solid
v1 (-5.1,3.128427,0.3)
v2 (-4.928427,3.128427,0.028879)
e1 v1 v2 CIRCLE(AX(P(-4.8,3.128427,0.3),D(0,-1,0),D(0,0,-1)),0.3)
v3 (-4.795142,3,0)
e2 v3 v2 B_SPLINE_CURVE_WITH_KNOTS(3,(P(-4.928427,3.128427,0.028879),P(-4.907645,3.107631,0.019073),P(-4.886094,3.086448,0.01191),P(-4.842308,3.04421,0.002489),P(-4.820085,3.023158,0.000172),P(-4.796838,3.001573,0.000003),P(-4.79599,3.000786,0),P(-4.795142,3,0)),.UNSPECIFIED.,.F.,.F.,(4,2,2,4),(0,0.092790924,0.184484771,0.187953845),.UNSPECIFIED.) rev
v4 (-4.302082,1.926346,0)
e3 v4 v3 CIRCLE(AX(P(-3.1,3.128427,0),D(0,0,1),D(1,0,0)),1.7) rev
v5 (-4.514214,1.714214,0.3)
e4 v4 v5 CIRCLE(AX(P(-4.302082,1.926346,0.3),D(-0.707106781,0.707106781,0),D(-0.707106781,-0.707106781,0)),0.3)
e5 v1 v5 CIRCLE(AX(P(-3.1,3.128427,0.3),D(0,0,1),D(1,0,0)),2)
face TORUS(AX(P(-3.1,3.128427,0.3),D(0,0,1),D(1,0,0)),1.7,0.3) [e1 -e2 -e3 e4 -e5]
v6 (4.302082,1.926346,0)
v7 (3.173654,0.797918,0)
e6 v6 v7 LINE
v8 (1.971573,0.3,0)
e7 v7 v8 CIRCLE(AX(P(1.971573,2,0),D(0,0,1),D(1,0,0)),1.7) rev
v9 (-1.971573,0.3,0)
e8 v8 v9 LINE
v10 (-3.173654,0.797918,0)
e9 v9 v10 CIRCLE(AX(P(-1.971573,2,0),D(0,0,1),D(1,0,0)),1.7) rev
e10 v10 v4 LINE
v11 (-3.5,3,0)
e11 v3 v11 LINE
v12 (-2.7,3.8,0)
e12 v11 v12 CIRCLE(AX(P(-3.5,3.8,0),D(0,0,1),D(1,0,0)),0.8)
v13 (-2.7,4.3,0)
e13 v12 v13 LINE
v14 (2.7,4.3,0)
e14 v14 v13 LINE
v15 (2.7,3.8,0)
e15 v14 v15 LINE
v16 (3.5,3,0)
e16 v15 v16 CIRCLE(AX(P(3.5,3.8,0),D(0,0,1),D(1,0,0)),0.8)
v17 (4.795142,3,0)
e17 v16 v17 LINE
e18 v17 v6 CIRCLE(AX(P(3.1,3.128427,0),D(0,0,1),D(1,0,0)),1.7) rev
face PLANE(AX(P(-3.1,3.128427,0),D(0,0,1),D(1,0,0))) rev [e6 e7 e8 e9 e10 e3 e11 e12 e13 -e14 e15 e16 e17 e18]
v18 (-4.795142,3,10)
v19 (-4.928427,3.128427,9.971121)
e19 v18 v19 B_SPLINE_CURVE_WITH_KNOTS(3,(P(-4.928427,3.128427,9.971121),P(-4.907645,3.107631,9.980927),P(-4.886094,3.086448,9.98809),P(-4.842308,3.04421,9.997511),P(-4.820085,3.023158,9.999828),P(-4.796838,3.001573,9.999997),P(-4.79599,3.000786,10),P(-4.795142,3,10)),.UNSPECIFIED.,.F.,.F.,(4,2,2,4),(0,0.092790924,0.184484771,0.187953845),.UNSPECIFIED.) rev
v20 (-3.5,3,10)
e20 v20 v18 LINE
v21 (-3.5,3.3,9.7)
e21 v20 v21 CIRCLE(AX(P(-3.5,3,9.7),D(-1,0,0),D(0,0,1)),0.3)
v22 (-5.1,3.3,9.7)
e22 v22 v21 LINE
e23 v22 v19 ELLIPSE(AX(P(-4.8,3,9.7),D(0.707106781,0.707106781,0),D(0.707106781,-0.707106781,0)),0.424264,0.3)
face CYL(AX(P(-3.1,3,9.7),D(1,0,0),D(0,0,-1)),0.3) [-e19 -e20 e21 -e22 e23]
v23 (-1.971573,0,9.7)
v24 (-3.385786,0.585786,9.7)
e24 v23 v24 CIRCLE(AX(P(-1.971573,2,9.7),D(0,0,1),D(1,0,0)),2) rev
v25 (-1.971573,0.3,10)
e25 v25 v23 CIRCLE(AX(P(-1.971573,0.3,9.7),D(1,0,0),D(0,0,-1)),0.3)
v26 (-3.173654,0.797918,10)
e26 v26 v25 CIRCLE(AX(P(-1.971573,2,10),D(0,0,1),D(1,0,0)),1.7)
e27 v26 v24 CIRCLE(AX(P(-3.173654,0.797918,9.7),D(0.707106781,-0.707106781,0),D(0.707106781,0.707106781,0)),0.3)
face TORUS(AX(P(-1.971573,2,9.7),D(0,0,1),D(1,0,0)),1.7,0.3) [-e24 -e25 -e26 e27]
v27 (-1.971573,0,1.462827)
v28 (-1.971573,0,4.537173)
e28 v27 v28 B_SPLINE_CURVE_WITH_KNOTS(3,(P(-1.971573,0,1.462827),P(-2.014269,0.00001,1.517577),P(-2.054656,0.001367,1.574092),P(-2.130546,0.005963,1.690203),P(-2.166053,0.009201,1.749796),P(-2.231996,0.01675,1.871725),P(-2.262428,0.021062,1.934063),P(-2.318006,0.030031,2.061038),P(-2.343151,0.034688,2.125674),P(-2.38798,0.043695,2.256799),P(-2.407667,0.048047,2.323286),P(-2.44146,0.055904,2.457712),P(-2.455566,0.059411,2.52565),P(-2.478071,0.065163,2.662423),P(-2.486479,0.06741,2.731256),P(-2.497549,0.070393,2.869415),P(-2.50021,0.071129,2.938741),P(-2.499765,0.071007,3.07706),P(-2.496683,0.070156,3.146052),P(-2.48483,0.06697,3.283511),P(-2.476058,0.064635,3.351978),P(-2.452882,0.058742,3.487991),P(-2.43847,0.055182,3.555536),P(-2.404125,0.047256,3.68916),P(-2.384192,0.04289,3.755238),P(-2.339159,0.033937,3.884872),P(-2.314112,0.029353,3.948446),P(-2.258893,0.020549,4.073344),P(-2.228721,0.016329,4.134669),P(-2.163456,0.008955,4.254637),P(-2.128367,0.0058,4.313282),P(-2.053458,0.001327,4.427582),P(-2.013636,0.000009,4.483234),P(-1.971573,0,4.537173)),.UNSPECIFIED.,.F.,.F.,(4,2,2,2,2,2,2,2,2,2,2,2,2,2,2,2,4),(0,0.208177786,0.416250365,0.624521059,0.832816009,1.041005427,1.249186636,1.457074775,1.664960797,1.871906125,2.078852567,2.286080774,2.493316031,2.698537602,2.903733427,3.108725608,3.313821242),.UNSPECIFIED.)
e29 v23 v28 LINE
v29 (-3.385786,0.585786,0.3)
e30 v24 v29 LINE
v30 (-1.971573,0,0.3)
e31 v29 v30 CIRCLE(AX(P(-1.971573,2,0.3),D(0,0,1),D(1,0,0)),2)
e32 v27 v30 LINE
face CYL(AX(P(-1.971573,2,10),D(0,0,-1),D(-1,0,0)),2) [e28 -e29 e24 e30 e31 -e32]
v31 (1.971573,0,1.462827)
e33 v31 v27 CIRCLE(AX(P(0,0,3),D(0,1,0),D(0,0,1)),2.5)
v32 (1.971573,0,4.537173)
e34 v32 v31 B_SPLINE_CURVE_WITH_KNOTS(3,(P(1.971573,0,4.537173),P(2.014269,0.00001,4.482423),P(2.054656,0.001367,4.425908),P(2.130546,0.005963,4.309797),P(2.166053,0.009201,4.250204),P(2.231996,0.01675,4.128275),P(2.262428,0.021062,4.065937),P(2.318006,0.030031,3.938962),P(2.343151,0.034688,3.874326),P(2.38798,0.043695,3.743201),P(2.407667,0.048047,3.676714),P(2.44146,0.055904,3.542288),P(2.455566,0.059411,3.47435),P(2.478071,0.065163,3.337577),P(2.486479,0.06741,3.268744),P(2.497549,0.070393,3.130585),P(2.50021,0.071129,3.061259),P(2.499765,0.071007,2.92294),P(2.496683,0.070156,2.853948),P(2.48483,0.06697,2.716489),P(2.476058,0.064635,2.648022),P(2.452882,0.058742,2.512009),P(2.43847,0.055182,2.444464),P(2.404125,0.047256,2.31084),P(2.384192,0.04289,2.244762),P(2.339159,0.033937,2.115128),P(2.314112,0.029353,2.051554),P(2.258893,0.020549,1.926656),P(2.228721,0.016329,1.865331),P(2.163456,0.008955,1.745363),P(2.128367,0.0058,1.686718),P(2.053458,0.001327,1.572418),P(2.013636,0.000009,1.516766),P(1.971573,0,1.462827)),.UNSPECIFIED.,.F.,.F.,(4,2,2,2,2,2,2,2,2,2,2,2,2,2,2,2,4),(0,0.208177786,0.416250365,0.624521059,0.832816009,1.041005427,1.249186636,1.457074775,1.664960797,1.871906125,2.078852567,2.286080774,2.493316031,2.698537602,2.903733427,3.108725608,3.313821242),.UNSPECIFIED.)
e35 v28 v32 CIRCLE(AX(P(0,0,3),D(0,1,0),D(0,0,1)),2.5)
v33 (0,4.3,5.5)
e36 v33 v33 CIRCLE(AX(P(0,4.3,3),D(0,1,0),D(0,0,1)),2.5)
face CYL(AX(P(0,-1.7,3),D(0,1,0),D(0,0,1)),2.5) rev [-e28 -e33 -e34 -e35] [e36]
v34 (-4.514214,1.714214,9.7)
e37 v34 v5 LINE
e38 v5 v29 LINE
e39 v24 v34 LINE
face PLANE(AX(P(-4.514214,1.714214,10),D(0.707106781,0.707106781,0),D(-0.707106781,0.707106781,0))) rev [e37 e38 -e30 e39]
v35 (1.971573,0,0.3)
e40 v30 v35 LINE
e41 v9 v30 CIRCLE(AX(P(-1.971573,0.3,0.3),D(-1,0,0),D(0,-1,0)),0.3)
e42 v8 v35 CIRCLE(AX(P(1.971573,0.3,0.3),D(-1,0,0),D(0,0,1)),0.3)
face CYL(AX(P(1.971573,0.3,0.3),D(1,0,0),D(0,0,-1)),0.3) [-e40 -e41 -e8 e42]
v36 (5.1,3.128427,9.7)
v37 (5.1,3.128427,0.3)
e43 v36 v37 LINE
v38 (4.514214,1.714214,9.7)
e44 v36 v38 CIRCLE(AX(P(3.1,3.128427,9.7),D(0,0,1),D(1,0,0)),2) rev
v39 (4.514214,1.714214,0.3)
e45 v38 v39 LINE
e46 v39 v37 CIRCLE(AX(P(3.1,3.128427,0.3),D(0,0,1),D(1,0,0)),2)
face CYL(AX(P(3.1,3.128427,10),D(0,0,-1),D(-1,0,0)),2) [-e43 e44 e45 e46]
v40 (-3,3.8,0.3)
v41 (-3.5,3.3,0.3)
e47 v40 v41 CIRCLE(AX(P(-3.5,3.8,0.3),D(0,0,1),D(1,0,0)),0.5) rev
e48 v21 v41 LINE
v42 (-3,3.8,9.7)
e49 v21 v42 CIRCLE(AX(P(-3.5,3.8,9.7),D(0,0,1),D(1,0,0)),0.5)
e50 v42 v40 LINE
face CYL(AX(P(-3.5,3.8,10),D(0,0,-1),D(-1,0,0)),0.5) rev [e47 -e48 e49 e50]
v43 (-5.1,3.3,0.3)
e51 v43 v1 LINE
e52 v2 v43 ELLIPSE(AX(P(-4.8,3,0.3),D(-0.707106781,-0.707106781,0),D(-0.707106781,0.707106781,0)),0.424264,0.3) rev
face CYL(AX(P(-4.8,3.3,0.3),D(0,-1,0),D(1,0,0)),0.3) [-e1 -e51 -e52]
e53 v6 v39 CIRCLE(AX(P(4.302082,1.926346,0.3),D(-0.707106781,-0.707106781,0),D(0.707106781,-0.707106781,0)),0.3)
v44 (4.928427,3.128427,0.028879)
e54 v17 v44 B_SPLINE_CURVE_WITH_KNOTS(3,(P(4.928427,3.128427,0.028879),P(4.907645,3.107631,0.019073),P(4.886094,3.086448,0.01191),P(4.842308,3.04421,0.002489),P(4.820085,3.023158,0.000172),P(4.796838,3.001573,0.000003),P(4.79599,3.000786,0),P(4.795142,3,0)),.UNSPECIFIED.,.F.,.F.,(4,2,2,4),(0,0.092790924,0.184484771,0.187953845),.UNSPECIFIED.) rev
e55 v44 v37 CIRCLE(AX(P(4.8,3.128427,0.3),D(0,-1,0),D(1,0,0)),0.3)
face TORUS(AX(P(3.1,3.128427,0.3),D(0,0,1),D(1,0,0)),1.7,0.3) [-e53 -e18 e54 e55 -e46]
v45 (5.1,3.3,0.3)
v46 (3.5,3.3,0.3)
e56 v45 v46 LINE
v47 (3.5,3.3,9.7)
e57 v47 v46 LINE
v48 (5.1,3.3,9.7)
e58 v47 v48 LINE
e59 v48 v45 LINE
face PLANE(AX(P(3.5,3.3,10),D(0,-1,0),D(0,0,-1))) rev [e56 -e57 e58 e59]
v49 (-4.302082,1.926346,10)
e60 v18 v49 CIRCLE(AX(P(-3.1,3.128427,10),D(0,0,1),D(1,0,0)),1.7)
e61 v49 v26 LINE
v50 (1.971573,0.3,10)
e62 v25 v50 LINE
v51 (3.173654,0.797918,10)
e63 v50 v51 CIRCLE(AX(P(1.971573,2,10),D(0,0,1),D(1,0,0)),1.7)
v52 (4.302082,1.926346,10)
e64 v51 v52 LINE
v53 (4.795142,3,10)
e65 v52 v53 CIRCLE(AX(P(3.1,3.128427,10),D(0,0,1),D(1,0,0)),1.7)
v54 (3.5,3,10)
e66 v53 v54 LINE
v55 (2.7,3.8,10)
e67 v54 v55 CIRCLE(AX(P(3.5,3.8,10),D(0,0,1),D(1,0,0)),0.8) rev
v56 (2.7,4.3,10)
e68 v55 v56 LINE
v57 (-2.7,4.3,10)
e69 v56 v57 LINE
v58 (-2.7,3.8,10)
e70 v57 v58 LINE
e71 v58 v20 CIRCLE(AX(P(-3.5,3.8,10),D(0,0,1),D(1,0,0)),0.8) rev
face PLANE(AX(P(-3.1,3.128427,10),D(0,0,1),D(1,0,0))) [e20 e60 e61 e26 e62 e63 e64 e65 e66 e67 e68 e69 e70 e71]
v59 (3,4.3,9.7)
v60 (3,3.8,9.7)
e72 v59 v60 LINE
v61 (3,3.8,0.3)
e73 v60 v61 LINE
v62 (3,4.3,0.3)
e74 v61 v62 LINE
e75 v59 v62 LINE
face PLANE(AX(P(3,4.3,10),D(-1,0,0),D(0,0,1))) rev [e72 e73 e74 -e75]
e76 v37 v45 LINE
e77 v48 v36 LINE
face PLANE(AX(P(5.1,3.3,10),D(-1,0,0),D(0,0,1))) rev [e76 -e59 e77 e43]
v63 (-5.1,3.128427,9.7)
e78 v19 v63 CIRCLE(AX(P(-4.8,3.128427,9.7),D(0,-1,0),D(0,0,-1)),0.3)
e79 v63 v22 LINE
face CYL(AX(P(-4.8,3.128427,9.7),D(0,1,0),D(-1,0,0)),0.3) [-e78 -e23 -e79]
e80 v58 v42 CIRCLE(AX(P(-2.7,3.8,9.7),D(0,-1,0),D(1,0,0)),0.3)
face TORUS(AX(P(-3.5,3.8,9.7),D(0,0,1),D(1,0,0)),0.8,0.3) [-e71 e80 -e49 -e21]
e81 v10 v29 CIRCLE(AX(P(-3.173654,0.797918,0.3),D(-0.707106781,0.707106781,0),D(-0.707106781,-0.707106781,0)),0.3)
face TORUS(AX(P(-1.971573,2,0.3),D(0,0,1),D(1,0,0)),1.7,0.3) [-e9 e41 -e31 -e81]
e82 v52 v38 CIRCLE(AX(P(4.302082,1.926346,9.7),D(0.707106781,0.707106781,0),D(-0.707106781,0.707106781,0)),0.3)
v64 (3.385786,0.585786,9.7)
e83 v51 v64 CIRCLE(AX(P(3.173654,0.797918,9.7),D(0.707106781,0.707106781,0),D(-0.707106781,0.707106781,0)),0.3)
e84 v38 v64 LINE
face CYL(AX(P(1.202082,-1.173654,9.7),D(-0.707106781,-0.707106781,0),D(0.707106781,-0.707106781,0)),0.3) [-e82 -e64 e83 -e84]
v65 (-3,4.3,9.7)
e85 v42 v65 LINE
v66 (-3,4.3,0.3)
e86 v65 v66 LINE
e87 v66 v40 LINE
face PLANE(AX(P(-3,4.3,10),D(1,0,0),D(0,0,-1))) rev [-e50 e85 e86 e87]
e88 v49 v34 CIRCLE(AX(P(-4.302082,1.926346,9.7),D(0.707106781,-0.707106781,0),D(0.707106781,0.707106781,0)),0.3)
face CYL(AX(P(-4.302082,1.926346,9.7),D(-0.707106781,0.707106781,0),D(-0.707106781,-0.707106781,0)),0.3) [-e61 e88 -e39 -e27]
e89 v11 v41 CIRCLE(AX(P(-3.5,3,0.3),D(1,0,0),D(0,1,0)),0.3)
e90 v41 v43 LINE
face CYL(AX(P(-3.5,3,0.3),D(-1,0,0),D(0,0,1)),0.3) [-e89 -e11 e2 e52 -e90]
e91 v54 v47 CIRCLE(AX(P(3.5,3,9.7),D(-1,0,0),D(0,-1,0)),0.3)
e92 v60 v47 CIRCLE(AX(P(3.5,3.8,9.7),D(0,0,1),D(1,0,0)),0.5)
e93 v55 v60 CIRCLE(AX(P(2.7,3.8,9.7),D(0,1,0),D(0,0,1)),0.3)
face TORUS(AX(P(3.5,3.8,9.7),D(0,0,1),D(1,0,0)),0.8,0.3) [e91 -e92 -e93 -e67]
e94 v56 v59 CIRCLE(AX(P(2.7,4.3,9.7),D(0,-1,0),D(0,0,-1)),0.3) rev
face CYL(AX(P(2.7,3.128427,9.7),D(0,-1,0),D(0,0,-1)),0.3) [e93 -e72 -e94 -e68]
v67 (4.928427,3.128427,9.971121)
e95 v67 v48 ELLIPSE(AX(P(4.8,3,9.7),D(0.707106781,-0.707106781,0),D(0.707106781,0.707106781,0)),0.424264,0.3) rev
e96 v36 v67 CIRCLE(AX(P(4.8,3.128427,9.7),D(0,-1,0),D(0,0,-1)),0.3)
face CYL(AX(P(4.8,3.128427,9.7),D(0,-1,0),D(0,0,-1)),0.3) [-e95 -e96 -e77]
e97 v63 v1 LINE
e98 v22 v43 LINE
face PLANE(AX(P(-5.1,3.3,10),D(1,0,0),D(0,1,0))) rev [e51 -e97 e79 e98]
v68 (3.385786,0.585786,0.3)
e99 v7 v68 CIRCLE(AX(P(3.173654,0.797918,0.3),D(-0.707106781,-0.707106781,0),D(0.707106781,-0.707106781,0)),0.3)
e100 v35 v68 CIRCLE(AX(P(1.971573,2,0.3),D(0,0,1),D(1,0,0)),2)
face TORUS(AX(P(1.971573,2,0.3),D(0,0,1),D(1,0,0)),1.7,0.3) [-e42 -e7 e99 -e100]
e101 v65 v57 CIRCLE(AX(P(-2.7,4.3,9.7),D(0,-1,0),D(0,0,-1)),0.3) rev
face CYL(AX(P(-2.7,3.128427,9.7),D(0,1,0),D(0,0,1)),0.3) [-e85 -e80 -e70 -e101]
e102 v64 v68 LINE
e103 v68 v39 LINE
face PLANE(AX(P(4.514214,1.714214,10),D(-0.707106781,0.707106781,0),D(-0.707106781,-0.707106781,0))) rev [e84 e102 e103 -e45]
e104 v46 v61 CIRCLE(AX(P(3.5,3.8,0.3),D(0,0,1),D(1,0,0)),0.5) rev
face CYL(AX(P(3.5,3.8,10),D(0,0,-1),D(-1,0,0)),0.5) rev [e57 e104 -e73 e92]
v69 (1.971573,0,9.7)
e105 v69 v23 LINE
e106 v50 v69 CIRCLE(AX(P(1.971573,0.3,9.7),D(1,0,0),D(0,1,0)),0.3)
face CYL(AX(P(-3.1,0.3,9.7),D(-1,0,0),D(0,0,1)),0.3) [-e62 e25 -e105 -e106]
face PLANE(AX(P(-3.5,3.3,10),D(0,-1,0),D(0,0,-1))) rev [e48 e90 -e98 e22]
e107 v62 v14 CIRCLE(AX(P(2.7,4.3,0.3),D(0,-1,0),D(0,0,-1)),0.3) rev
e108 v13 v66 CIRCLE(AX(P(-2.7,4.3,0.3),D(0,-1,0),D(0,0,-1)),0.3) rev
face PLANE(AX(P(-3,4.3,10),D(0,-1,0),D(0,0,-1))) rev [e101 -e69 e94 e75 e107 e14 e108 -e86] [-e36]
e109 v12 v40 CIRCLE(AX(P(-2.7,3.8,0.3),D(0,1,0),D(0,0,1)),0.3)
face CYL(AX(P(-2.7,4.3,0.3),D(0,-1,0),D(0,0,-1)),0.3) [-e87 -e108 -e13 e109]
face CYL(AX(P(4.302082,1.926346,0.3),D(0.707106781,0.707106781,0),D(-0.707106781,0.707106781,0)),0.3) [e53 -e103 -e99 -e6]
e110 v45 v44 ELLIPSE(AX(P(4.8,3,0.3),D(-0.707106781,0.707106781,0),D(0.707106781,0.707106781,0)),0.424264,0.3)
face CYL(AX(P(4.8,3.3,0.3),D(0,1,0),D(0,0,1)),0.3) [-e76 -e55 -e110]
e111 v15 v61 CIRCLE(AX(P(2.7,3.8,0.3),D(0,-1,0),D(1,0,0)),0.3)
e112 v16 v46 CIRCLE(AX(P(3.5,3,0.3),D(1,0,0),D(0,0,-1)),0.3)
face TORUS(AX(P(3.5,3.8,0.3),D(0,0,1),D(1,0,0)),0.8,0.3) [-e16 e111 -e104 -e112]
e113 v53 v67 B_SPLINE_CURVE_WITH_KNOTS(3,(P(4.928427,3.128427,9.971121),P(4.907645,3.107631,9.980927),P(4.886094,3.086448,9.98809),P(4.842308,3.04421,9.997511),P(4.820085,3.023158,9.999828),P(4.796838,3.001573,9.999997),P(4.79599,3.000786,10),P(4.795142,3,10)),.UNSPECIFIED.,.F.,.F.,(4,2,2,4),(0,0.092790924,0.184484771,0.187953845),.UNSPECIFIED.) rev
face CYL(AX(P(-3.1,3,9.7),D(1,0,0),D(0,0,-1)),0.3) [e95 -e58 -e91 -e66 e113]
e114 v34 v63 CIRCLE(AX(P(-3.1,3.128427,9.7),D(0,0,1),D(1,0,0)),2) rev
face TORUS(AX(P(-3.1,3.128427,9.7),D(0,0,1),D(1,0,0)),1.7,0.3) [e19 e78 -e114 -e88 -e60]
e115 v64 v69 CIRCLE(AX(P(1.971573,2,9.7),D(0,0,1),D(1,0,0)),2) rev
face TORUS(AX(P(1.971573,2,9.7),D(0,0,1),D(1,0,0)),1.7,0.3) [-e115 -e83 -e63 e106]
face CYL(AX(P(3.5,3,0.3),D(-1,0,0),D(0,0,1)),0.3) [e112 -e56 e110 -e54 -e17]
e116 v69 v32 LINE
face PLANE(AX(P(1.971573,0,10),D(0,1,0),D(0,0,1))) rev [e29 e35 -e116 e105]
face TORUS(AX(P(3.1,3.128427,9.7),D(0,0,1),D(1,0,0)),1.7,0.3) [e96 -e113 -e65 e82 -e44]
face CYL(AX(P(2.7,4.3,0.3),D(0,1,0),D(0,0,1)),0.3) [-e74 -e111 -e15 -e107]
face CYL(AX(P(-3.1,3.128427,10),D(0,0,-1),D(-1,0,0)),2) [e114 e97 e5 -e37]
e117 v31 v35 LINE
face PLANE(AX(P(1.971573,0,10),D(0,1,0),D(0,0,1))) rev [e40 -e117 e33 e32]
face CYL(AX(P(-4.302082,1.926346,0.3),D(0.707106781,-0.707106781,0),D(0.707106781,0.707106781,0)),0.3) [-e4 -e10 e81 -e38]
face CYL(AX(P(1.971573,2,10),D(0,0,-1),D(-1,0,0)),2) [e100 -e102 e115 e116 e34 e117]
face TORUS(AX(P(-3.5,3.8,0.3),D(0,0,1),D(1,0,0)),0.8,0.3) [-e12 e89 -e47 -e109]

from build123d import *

# Parameters (mm, degrees)
EXTRUDE_1_DEPTH     = 10
FILLET_3_R          = 0.3
SKETCH_2_R          = 2.5
CUT_EXTRUDE_1_DEPTH = 6


with BuildPart() as part:
    # 草图1 → 凸台-拉伸1 (new body)
    with BuildSketch(Plane.XY):
        with BuildLine():
            Line((-3, 4.3), (3, 4.3))
            Line((3, 4.3), (3, 3.8))
            ThreePointArc((3, 3.8), (3.146446609, 3.446446609), (3.5, 3.3))
            Line((3.5, 3.3), (5.1, 3.3))
            Line((5.1, 3.3), (5.1, 3.128427125))
            ThreePointArc((5.1, 3.128427125), (4.947759065, 2.36306026), (4.514213562, 1.714213562))
            Line((4.514213562, 1.714213562), (3.385786438, 0.585786438))
            ThreePointArc((3.385786438, 0.585786438), (2.73693974, 0.152240935), (1.971572875, 0))
            Line((1.971572875, 0), (-1.971572875, 0))
            ThreePointArc((-1.971572875, 0), (-2.73693974, 0.152240935), (-3.385786438, 0.585786438))
            Line((-3.385786438, 0.585786438), (-4.514213562, 1.714213562))
            ThreePointArc((-4.514213562, 1.714213562), (-4.947759065, 2.36306026), (-5.1, 3.128427125))
            Line((-5.1, 3.128427125), (-5.1, 3.3))
            Line((-5.1, 3.3), (-3.5, 3.3))
            ThreePointArc((-3.5, 3.3), (-3.146446609, 3.446446609), (-3, 3.8))
            Line((-3, 3.8), (-3, 4.3))
        make_face()
    extrude(amount=EXTRUDE_1_DEPTH)

    # 圆角3
    # the kernel refuses this fillet: 0.3 mm, written as the material it takes off along each edge
    with BuildSketch(Plane(origin=(-3, 3.8, 10), x_dir=(0, 0, -1), z_dir=(0, 1, 0)), Plane(origin=(3, 5.05, 10), x_dir=(0, 0, -1), z_dir=(0, -1, 0))) as fillet_3_piece_1:
        with BuildLine():
            CenterArc((FILLET_3_R, -FILLET_3_R), FILLET_3_R, 90, 90)
            Line((0, -FILLET_3_R), (0, 0))
            Line((0, 0), (FILLET_3_R, 0))
        make_face()
    extrude(amount=1.25, mode=Mode.SUBTRACT)
    with BuildSketch(Plane(origin=(3, 5.05, 0), x_dir=(0, 0, 1), z_dir=(0, -1, 0)), Plane(origin=(-3, 3.8, 0), x_dir=(0, 0, 1), z_dir=(0, 1, 0))) as fillet_3_piece_2:
        with BuildLine():
            CenterArc((FILLET_3_R, FILLET_3_R), FILLET_3_R, 180, 90)
            Line((0, FILLET_3_R), (0, 0))
            Line((0, 0), (FILLET_3_R, 0))
        make_face()
    extrude(amount=1.25, mode=Mode.SUBTRACT)
    with BuildSketch(Plane(origin=(4.514213562, 1.714213562, 10), x_dir=(0, 0, -1), z_dir=(-0.7071067811865436, -0.7071067811865515, 0)), Plane(origin=(-3.385786438, 0.585786438, 10), x_dir=(0, 0, -1), z_dir=(-0.7071067811865436, 0.7071067811865515, 0))) as fillet_3_piece_3:
        with BuildLine():
            CenterArc((FILLET_3_R, -FILLET_3_R), FILLET_3_R, 90, 90)
            Line((0, -FILLET_3_R), (0, 0))
            Line((0, 0), (FILLET_3_R, 0))
        make_face()
    extrude(amount=1.595836944, mode=Mode.SUBTRACT)
    with BuildSketch(Plane(origin=(1.971572875, 2, 10), x_dir=(0.7071067811865542, -0.7071067811865409, 0), z_dir=(0.7071067811865409, 0.7071067811865542, 0))) as fillet_3_piece_4:
        with BuildLine():
            CenterArc((2 - FILLET_3_R, FILLET_3_R), FILLET_3_R, 270, 90)
            Line((2 - FILLET_3_R, 0), (2, 0))
            Line((2, 0), (2, FILLET_3_R))
        make_face()
    revolve(axis=Axis((1.971572875, 2, 10), (0, 0, -1)), revolution_arc=45, mode=Mode.SUBTRACT)
    with BuildSketch(Plane(origin=(1.971572875, 0, 10), x_dir=(0, 0, -1), z_dir=(-1, 0, 0))) as fillet_3_piece_5:
        with BuildLine():
            CenterArc((FILLET_3_R, -FILLET_3_R), FILLET_3_R, 90, 90)
            Line((0, -FILLET_3_R), (0, 0))
            Line((0, 0), (FILLET_3_R, 0))
        make_face()
    extrude(amount=3.943145751, mode=Mode.SUBTRACT)
    with BuildSketch(Plane(origin=(-1.971572875, 2, 10), x_dir=(0, -1, 0), z_dir=(1, 0, 0))) as fillet_3_piece_6:
        with BuildLine():
            CenterArc((2 - FILLET_3_R, FILLET_3_R), FILLET_3_R, 270, 90)
            Line((2 - FILLET_3_R, 0), (2, 0))
            Line((2, 0), (2, FILLET_3_R))
        make_face()
    revolve(axis=Axis((-1.971572875, 2, 10), (0, 0, -1)), revolution_arc=45, mode=Mode.SUBTRACT)
    with BuildSketch(Plane(origin=(-3.1, 3.128427125, 10), x_dir=(-0.7071067811865485, -0.7071067811865466, 0), z_dir=(0.7071067811865466, -0.7071067811865485, 0))) as fillet_3_piece_7:
        with BuildLine():
            CenterArc((2 - FILLET_3_R, FILLET_3_R), FILLET_3_R, 270, 90)
            Line((2 - FILLET_3_R, 0), (2, 0))
            Line((2, 0), (2, FILLET_3_R))
        make_face()
    revolve(axis=Axis((-3.1, 3.128427125, 10), (0, 0, -1)), revolution_arc=45, mode=Mode.SUBTRACT)
    with BuildSketch(Plane(origin=(-5.85, 3.3, 10), x_dir=(0, 0, -1), z_dir=(1, 0, 0)), Plane(origin=(3.5, 3.3, 10), x_dir=(0, 0, -1), z_dir=(1, 0, 0))) as fillet_3_piece_8:
        with BuildLine():
            CenterArc((FILLET_3_R, -FILLET_3_R), FILLET_3_R, 90, 90)
            Line((0, -FILLET_3_R), (0, 0))
            Line((0, 0), (FILLET_3_R, 0))
        make_face()
    extrude(amount=2.35, mode=Mode.SUBTRACT)
    with BuildSketch(Plane(origin=(-3.5, 3.8, 10), x_dir=(0, -1, 0), z_dir=(-1, 0, 0))) as fillet_3_piece_9:
        with BuildLine():
            CenterArc((0.5 + FILLET_3_R, -FILLET_3_R), FILLET_3_R, 90, 90)
            Line((0.5 + FILLET_3_R, 0), (0.5, 0))
            Line((0.5, 0), (0.5, -FILLET_3_R))
        make_face()
    revolve(axis=Axis((-3.5, 3.8, 10), (0, 0, 1)), revolution_arc=90, mode=Mode.SUBTRACT)
    with BuildSketch(Plane(origin=(3.5, 3.3, 0), x_dir=(0, 0, 1), z_dir=(1, 0, 0)), Plane(origin=(-5.85, 3.3, 0), x_dir=(0, 0, 1), z_dir=(1, 0, 0))) as fillet_3_piece_10:
        with BuildLine():
            CenterArc((FILLET_3_R, FILLET_3_R), FILLET_3_R, 180, 90)
            Line((0, FILLET_3_R), (0, 0))
            Line((0, 0), (FILLET_3_R, 0))
        make_face()
    extrude(amount=2.35, mode=Mode.SUBTRACT)
    with BuildSketch(Plane(origin=(3.5, 3.8, 0), x_dir=(-1, 0, 0), z_dir=(0, 1, 0))) as fillet_3_piece_11:
        with BuildLine():
            CenterArc((0.5 + FILLET_3_R, FILLET_3_R), FILLET_3_R, 180, 90)
            Line((0.5 + FILLET_3_R, 0), (0.5, 0))
            Line((0.5, 0), (0.5, FILLET_3_R))
        make_face()
    revolve(axis=Axis((3.5, 3.8, 0), (0, 0, 1)), revolution_arc=90, mode=Mode.SUBTRACT)
    with BuildSketch(Plane(origin=(-3.385786438, 0.585786438, 0), x_dir=(0, 0, 1), z_dir=(-0.7071067811865436, 0.7071067811865515, 0)), Plane(origin=(4.514213562, 1.714213562, 0), x_dir=(0, 0, 1), z_dir=(-0.7071067811865436, -0.7071067811865515, 0))) as fillet_3_piece_12:
        with BuildLine():
            CenterArc((FILLET_3_R, FILLET_3_R), FILLET_3_R, 180, 90)
            Line((0, FILLET_3_R), (0, 0))
            Line((0, 0), (FILLET_3_R, 0))
        make_face()
    extrude(amount=1.595836944, mode=Mode.SUBTRACT)
    with BuildSketch(Plane(origin=(-1.971572875, 2, 0), x_dir=(0, -1, 0), z_dir=(1, 0, 0))) as fillet_3_piece_13:
        with BuildLine():
            CenterArc((2 - FILLET_3_R, -FILLET_3_R), FILLET_3_R, 0, 90)
            Line((2 - FILLET_3_R, 0), (2, 0))
            Line((2, 0), (2, -FILLET_3_R))
        make_face()
    revolve(axis=Axis((-1.971572875, 2, 0), (0, 0, -1)), revolution_arc=45, mode=Mode.SUBTRACT)
    with BuildSketch(Plane(origin=(1.971572875, 0, 0), x_dir=(0, 0, 1), z_dir=(-1, 0, 0))) as fillet_3_piece_14:
        with BuildLine():
            CenterArc((FILLET_3_R, FILLET_3_R), FILLET_3_R, 180, 90)
            Line((0, FILLET_3_R), (0, 0))
            Line((0, 0), (FILLET_3_R, 0))
        make_face()
    extrude(amount=3.943145751, mode=Mode.SUBTRACT)
    with BuildSketch(Plane(origin=(1.971572875, 2, 0), x_dir=(0.7071067811865542, -0.7071067811865409, 0), z_dir=(0.7071067811865409, 0.7071067811865542, 0))) as fillet_3_piece_15:
        with BuildLine():
            CenterArc((2 - FILLET_3_R, -FILLET_3_R), FILLET_3_R, 0, 90)
            Line((2 - FILLET_3_R, 0), (2, 0))
            Line((2, 0), (2, -FILLET_3_R))
        make_face()
    revolve(axis=Axis((1.971572875, 2, 0), (0, 0, -1)), revolution_arc=45, mode=Mode.SUBTRACT)
    with BuildSketch(Plane(origin=(3.1, 3.128427125, 0), x_dir=(1, 0, 0), z_dir=(0, 1, 0))) as fillet_3_piece_16:
        with BuildLine():
            CenterArc((2 - FILLET_3_R, -FILLET_3_R), FILLET_3_R, 0, 90)
            Line((2 - FILLET_3_R, 0), (2, 0))
            Line((2, 0), (2, -FILLET_3_R))
        make_face()
    revolve(axis=Axis((3.1, 3.128427125, 0), (0, 0, -1)), revolution_arc=45, mode=Mode.SUBTRACT)
    with BuildSketch(Plane(origin=(3.1, 3.128427125, 10), x_dir=(1, 0, 0), z_dir=(0, 1, 0))) as fillet_3_piece_17:
        with BuildLine():
            CenterArc((2 - FILLET_3_R, FILLET_3_R), FILLET_3_R, 270, 90)
            Line((2 - FILLET_3_R, 0), (2, 0))
            Line((2, 0), (2, FILLET_3_R))
        make_face()
    revolve(axis=Axis((3.1, 3.128427125, 10), (0, 0, -1)), revolution_arc=45, mode=Mode.SUBTRACT)
    with BuildSketch(Plane(origin=(-3.1, 3.128427125, 0), x_dir=(-0.7071067811865485, -0.7071067811865466, 0), z_dir=(0.7071067811865466, -0.7071067811865485, 0))) as fillet_3_piece_18:
        with BuildLine():
            CenterArc((2 - FILLET_3_R, -FILLET_3_R), FILLET_3_R, 0, 90)
            Line((2 - FILLET_3_R, 0), (2, 0))
            Line((2, 0), (2, -FILLET_3_R))
        make_face()
    revolve(axis=Axis((-3.1, 3.128427125, 0), (0, 0, -1)), revolution_arc=45, mode=Mode.SUBTRACT)
    with BuildSketch(Plane(origin=(3.5, 3.8, 10), x_dir=(-1, 0, 0), z_dir=(0, 1, 0))) as fillet_3_piece_19:
        with BuildLine():
            CenterArc((0.5 + FILLET_3_R, -FILLET_3_R), FILLET_3_R, 90, 90)
            Line((0.5 + FILLET_3_R, 0), (0.5, 0))
            Line((0.5, 0), (0.5, -FILLET_3_R))
        make_face()
    revolve(axis=Axis((3.5, 3.8, 10), (0, 0, 1)), revolution_arc=90, mode=Mode.SUBTRACT)
    with BuildSketch(Plane(origin=(-3.5, 3.8, 0), x_dir=(0, -1, 0), z_dir=(-1, 0, 0))) as fillet_3_piece_20:
        with BuildLine():
            CenterArc((0.5 + FILLET_3_R, FILLET_3_R), FILLET_3_R, 180, 90)
            Line((0.5 + FILLET_3_R, 0), (0.5, 0))
            Line((0.5, 0), (0.5, FILLET_3_R))
        make_face()
    revolve(axis=Axis((-3.5, 3.8, 0), (0, 0, 1)), revolution_arc=90, mode=Mode.SUBTRACT)
    with BuildSketch(Plane(origin=(-5.1, 3.128427125, 0), x_dir=(0, 0, 1), z_dir=(0, 1, 0)), Plane(origin=(5.1, 4.05, 0), x_dir=(0, 0, 1), z_dir=(0, -1, 0))) as fillet_3_piece_21:
        with BuildLine():
            CenterArc((FILLET_3_R, FILLET_3_R), FILLET_3_R, 180, 90)
            Line((0, FILLET_3_R), (0, 0))
            Line((0, 0), (FILLET_3_R, 0))
        make_face()
    extrude(amount=0.921572875, mode=Mode.SUBTRACT)
    with BuildSketch(Plane(origin=(5.1, 4.05, 10), x_dir=(0, 0, -1), z_dir=(0, -1, 0)), Plane(origin=(-5.1, 3.128427125, 10), x_dir=(0, 0, -1), z_dir=(0, 1, 0))) as fillet_3_piece_22:
        with BuildLine():
            CenterArc((FILLET_3_R, -FILLET_3_R), FILLET_3_R, 90, 90)
            Line((0, -FILLET_3_R), (0, 0))
            Line((0, 0), (FILLET_3_R, 0))
        make_face()
    extrude(amount=0.921572875, mode=Mode.SUBTRACT)

    # 草图2 → 切除-拉伸1 (cut)
    with BuildSketch(Plane(origin=(0, 4.3, 0), x_dir=(1, 0, 0), z_dir=(0, 1, 0))):
        with Locations(Location((0, -3, 0), (0, 0, 270))):
            Circle(SKETCH_2_R)
    extrude(amount=-CUT_EXTRUDE_1_DEPTH, mode=Mode.SUBTRACT)


solid = part.part
